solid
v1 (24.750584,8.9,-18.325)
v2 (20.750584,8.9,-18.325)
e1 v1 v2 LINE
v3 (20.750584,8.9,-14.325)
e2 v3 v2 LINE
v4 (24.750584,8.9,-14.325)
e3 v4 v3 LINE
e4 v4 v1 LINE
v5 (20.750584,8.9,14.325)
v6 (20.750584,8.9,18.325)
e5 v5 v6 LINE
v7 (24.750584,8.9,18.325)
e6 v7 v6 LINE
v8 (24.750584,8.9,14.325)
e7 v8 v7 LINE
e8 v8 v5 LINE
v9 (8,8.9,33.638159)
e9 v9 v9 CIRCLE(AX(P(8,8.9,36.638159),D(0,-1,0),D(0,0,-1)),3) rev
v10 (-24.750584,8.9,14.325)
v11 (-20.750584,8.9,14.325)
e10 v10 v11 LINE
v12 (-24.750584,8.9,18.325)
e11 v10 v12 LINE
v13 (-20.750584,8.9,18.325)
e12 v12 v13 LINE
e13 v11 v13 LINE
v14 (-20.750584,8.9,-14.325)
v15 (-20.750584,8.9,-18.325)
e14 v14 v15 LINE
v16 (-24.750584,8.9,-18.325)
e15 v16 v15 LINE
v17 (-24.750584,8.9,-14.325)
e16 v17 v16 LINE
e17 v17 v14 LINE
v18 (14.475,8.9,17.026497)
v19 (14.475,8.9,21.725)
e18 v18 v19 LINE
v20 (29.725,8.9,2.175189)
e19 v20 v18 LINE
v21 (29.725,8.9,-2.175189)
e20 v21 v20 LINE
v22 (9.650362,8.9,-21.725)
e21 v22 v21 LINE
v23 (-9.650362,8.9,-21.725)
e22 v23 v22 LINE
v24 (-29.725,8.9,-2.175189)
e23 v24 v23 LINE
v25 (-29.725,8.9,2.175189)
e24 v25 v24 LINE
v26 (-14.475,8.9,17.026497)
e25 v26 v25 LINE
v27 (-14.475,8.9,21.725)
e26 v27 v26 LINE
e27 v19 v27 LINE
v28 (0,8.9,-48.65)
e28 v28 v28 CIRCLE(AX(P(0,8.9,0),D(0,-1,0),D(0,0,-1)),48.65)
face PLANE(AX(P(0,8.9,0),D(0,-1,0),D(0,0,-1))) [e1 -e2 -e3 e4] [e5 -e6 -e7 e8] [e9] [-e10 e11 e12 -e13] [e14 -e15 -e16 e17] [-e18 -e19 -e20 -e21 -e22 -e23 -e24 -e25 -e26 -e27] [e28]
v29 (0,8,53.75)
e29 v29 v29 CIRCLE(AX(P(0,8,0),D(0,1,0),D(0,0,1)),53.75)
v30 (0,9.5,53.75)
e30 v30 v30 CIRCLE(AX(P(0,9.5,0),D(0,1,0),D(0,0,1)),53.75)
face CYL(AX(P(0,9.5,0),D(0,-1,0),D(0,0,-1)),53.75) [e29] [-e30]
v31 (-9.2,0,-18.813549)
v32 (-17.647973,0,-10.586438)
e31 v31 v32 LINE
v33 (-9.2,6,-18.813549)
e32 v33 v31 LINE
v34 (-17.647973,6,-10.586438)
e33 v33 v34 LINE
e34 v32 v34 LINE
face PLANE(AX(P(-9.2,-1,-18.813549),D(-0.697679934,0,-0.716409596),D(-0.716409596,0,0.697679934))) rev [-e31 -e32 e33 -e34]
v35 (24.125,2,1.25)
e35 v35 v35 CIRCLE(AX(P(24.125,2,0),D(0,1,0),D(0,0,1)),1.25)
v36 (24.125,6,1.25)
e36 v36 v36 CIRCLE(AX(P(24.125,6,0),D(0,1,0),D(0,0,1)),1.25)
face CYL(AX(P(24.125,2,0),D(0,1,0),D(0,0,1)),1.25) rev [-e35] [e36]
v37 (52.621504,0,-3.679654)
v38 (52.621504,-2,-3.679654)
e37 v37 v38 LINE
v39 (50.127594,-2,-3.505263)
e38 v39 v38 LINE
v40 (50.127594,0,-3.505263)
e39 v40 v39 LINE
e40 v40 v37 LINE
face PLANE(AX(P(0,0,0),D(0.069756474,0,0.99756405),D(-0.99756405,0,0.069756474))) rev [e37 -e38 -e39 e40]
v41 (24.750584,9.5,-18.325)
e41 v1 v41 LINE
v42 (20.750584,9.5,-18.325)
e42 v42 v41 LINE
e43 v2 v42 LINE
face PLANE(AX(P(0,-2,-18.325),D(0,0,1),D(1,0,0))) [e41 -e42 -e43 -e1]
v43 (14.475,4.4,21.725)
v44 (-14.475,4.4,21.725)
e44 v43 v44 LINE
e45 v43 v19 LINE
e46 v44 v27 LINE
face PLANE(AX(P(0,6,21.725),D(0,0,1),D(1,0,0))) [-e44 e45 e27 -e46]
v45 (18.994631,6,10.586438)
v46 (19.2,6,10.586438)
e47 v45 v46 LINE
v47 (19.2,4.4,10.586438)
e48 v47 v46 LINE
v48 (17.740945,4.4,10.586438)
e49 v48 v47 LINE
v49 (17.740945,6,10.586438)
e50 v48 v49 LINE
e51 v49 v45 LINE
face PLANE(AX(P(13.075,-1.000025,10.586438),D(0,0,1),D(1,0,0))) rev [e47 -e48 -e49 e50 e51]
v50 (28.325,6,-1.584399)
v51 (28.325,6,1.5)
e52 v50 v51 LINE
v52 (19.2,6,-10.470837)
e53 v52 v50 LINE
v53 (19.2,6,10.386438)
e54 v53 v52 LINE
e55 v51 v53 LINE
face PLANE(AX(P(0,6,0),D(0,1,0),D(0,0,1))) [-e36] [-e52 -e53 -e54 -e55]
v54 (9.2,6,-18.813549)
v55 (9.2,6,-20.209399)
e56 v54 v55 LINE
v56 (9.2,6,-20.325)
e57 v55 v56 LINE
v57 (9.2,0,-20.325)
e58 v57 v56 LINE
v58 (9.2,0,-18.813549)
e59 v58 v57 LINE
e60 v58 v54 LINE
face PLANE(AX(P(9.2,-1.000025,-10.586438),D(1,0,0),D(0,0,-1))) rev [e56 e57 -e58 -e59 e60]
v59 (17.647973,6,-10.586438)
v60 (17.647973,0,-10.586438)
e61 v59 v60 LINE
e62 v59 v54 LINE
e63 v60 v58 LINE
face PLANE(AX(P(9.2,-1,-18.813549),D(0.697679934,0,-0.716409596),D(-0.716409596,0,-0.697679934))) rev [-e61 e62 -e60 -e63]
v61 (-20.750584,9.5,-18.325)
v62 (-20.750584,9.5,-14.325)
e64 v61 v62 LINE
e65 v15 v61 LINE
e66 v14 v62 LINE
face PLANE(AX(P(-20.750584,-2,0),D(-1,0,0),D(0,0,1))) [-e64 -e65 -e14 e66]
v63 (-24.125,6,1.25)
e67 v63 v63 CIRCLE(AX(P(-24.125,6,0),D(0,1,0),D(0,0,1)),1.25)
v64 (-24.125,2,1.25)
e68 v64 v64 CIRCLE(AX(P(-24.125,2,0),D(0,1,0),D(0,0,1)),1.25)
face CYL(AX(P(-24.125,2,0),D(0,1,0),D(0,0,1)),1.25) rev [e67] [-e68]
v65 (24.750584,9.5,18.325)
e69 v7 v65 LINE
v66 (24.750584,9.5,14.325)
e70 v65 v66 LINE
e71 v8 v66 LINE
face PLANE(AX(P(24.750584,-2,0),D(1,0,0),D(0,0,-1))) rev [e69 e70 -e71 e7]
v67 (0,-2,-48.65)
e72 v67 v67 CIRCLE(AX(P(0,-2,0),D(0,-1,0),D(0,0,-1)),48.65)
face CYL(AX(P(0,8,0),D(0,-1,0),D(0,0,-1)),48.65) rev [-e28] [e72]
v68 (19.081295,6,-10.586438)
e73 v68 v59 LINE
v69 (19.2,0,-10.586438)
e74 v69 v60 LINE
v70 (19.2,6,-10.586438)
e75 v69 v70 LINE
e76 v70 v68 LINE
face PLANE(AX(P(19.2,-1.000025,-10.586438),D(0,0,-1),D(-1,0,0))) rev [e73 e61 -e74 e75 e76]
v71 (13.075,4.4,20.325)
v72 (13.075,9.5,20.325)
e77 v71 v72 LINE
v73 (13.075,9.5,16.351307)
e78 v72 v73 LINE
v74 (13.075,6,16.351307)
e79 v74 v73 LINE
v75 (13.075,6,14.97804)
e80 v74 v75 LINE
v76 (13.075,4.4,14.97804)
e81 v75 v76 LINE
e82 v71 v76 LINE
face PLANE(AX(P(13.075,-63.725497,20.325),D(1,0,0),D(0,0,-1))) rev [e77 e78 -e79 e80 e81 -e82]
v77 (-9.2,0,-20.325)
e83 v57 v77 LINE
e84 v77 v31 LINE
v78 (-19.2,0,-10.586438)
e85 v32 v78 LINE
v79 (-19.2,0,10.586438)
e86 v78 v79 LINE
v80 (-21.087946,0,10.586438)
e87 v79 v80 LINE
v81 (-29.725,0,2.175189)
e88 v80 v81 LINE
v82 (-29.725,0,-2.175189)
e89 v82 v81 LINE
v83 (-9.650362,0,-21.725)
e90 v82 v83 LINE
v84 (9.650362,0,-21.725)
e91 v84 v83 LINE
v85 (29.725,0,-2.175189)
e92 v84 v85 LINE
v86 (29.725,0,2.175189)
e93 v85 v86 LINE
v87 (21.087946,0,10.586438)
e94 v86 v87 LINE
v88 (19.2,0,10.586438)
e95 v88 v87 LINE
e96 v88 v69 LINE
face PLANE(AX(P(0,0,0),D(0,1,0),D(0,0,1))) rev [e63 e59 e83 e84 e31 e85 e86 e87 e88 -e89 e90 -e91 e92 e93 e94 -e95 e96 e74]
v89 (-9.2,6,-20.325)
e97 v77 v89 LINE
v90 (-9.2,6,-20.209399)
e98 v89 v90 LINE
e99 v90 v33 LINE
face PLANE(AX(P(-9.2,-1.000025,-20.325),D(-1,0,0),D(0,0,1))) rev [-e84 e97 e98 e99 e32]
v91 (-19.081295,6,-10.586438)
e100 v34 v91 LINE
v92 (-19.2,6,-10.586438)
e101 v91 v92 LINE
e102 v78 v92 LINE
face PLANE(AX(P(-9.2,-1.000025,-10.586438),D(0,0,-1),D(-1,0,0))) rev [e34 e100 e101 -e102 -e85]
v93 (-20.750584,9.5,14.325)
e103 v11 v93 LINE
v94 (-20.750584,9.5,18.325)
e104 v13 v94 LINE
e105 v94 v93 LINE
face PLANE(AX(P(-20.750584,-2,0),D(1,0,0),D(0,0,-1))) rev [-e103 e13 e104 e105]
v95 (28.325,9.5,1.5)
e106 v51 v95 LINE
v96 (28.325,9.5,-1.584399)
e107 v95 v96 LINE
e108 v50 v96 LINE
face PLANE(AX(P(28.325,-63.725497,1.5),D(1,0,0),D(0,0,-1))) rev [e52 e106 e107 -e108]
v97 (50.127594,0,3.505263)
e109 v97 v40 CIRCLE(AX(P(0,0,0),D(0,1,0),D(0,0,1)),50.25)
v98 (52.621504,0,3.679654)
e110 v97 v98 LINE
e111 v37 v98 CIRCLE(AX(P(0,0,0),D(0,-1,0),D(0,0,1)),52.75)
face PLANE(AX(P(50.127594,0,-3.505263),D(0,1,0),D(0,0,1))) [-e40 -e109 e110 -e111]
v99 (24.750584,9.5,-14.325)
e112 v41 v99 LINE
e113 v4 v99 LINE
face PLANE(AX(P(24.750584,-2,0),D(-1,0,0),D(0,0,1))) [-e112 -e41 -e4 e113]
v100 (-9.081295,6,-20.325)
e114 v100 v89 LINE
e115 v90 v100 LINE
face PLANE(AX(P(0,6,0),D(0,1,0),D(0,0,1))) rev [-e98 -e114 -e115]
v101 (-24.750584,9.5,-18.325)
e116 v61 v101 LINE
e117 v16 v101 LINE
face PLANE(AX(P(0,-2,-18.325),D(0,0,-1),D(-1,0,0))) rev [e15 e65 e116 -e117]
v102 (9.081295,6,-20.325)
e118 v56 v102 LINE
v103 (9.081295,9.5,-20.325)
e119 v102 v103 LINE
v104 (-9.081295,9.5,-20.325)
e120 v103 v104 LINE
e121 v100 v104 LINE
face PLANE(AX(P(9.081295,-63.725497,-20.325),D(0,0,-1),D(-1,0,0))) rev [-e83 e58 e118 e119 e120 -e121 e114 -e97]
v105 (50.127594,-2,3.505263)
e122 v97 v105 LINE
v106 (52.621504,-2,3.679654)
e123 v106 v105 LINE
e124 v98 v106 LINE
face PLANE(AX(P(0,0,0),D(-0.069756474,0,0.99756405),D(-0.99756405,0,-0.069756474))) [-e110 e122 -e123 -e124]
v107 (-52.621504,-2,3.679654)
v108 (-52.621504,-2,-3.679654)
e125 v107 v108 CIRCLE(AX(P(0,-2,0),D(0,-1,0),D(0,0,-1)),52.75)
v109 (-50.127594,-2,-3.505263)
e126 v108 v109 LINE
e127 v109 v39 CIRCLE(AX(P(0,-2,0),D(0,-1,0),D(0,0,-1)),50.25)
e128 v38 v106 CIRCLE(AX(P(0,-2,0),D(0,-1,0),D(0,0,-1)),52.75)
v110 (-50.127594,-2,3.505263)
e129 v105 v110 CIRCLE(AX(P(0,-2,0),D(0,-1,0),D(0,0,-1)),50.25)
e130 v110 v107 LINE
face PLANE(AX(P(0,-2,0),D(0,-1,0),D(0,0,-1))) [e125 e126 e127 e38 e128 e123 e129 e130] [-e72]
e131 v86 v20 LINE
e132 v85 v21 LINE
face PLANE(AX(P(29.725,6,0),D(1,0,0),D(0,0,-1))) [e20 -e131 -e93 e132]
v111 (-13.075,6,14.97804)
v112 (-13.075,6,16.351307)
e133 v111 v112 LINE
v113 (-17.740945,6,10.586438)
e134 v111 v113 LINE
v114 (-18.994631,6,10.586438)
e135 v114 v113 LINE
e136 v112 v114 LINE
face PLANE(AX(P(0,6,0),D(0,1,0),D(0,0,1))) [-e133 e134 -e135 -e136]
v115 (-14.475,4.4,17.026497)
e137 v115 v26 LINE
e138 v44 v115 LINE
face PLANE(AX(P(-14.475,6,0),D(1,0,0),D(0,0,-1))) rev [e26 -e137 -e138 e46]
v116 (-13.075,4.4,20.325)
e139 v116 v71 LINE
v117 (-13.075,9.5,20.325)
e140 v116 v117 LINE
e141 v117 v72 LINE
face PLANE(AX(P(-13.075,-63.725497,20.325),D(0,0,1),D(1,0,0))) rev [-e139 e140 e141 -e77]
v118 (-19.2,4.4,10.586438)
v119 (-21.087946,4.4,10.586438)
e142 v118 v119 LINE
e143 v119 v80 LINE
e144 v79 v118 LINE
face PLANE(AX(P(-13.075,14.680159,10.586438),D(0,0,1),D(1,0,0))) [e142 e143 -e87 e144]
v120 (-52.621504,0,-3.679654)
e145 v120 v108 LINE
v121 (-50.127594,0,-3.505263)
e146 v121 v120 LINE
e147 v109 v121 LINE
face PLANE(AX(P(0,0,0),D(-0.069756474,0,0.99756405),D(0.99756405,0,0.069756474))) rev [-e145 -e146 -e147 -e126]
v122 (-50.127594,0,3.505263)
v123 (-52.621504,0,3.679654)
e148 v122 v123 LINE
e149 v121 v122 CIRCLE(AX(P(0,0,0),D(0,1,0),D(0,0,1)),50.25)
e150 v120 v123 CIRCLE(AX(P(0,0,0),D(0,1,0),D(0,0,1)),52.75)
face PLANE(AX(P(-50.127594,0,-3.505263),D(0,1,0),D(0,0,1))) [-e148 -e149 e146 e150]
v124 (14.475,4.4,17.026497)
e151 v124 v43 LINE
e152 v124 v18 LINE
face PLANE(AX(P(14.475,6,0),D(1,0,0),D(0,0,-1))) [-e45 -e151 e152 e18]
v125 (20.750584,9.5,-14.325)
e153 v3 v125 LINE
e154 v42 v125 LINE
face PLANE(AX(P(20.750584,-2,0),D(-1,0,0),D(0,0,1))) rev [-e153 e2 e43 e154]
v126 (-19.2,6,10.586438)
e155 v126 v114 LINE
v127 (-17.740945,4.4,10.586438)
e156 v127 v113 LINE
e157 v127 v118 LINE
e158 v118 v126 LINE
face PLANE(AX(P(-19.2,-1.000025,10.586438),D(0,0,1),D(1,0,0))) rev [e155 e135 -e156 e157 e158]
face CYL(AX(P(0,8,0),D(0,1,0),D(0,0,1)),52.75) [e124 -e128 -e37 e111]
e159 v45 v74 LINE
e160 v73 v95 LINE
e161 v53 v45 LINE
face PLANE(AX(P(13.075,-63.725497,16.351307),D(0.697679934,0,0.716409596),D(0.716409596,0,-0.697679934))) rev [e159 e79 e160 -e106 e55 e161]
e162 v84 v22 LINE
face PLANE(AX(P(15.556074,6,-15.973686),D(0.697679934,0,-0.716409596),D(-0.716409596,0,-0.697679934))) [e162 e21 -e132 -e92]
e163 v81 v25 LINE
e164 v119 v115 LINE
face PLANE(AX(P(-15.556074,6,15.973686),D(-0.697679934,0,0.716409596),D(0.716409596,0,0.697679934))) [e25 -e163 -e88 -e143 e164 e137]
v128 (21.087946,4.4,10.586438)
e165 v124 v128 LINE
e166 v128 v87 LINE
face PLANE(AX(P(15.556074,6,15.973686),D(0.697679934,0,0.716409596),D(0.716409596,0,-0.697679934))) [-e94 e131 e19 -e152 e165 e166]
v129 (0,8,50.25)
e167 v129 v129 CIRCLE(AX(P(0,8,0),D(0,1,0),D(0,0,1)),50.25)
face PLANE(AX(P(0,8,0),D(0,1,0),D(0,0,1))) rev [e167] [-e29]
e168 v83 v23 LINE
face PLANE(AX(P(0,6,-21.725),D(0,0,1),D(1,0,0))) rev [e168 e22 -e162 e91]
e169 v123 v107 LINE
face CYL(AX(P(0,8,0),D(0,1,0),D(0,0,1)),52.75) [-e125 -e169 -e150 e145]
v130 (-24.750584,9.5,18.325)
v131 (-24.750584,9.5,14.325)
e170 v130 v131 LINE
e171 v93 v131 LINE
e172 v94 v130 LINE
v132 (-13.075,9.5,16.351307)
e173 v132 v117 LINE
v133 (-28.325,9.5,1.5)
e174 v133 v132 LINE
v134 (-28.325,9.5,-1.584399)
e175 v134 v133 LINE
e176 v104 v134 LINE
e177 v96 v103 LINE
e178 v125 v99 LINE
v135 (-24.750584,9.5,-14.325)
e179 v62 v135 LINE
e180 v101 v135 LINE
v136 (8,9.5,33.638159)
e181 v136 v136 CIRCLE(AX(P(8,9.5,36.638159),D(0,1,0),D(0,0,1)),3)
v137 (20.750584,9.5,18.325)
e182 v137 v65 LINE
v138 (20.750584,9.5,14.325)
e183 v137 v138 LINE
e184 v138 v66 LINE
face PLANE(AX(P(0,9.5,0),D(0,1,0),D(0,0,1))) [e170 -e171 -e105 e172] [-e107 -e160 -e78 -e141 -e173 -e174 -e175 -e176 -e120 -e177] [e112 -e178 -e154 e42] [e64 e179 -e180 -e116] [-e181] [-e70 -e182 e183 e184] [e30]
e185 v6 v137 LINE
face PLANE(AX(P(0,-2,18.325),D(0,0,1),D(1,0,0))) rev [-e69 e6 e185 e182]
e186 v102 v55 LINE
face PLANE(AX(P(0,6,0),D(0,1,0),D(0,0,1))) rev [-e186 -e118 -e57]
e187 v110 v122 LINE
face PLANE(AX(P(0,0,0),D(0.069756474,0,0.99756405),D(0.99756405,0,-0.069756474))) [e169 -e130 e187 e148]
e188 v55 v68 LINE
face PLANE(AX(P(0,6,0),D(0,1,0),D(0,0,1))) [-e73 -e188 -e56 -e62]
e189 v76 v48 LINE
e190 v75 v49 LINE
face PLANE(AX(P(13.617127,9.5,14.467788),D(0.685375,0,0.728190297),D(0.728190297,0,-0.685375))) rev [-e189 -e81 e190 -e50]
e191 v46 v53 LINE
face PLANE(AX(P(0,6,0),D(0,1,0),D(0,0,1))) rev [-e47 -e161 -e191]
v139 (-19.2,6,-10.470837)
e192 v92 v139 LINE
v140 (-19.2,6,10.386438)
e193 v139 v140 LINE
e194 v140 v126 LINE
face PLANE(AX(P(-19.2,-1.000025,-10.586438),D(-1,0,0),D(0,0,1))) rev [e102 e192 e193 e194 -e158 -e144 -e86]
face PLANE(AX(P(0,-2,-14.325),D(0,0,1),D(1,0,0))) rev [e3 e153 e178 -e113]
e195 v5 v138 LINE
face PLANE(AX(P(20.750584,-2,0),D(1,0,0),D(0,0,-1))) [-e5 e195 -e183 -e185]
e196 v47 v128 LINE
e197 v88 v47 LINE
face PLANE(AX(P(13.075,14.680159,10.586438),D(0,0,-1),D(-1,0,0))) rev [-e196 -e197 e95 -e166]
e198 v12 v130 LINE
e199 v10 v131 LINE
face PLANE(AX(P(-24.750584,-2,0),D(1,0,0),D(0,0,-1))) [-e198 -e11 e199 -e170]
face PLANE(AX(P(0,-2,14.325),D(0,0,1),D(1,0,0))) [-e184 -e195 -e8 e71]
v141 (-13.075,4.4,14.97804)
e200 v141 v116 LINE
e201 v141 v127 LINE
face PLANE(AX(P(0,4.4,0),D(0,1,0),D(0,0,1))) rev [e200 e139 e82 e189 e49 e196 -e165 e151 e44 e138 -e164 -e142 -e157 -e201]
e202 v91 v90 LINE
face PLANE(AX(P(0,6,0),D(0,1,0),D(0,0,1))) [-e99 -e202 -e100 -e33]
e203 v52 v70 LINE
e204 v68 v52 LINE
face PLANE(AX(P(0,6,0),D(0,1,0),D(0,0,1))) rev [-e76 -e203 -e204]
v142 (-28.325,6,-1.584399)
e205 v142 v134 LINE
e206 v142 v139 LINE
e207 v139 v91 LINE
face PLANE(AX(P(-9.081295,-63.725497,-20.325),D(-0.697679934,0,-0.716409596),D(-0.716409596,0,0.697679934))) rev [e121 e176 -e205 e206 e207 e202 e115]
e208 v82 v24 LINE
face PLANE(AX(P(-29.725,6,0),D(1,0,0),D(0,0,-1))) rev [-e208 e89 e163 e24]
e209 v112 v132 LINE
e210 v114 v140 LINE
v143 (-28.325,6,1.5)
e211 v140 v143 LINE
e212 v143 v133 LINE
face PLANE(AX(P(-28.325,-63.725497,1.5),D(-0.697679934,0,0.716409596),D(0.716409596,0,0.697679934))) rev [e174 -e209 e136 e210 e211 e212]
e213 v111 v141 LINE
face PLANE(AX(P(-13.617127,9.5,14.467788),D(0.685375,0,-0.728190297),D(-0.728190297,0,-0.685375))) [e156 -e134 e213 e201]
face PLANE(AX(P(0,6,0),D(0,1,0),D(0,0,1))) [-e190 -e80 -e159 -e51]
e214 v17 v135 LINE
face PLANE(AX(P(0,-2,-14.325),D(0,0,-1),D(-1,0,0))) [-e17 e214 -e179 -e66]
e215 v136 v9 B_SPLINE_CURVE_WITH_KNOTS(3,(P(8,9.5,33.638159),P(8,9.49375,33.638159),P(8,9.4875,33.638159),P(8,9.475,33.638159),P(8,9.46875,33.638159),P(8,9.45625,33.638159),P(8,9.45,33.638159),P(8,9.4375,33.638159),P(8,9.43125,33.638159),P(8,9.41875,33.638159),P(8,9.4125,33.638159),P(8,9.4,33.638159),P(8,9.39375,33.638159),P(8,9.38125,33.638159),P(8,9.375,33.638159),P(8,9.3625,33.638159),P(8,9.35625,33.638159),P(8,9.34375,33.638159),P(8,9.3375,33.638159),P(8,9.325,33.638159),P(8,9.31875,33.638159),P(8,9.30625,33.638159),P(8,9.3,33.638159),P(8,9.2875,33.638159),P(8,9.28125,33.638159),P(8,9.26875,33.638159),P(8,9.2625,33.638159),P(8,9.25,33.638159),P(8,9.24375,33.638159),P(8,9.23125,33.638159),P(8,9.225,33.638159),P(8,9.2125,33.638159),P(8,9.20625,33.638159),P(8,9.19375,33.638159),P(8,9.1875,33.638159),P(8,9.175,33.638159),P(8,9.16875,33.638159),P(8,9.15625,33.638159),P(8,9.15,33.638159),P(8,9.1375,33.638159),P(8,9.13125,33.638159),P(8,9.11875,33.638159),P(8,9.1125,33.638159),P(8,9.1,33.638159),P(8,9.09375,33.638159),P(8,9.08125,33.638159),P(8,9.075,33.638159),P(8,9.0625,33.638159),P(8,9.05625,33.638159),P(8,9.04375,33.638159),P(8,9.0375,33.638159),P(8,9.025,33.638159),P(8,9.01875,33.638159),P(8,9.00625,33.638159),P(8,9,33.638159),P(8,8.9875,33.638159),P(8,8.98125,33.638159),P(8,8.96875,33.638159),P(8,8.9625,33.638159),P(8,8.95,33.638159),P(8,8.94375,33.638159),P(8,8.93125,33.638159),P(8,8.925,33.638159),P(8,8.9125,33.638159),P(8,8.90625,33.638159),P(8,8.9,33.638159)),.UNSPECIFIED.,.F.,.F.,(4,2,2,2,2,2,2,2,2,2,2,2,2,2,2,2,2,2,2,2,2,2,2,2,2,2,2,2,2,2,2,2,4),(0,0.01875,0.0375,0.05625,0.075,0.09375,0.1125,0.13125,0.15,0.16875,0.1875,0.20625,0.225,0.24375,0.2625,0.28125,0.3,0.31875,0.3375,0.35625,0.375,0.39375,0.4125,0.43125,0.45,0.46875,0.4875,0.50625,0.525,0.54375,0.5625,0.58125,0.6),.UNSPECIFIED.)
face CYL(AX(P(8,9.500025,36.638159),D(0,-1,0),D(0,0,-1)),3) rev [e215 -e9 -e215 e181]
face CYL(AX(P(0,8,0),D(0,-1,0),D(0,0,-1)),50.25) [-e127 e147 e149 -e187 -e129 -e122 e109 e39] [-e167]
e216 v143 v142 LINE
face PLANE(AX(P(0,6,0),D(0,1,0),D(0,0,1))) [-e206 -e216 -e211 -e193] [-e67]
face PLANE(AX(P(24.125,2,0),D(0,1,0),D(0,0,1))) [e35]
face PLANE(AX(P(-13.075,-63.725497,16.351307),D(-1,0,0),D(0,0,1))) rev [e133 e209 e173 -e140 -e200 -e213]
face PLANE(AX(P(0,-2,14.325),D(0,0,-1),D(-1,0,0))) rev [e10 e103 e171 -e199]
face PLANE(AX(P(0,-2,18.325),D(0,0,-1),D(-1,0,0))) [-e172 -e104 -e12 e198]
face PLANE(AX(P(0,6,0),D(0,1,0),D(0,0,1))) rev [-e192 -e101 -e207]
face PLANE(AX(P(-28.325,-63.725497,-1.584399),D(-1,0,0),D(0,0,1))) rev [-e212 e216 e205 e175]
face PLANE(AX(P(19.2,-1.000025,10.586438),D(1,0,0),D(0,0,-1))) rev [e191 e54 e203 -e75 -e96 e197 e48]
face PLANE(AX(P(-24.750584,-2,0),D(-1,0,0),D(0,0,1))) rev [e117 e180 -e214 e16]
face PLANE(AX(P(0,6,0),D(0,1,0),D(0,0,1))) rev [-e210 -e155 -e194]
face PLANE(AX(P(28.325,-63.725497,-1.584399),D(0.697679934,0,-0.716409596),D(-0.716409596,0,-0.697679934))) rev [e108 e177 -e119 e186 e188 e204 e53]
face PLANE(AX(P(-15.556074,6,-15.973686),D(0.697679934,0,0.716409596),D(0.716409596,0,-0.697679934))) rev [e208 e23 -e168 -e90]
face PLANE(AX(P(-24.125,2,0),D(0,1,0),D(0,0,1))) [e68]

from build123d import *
from build123d.topology import SkipClean

# Parameters (mm, degrees)
SKETCH1_R           = 50.25
BOSS_EXTRUDE1_DEPTH = 8
SKETCH2_R           = 53.75
BOSS_EXTRUDE3_DEPTH = 1.5
SHELL1_T            = -1.6
REVOLVE1_START      = -1
REVOLVE1_DEPTH      = 1
BOSS_EXTRUDE4_START = 7.9
SKETCH6_R           = 48.65
BOSS_EXTRUDE4_DEPTH = 7.9
SKETCH5_W           = 9
SKETCH5_H           = 1.5
CUT_EXTRUDE1_DEPTH  = 3.5
SKETCH7_W           = 38
SKETCH7_H           = 20.772875816
SKETCH7_W_2         = 18
SKETCH7_H_2         = 9.738562092
CUT_EXTRUDE2_DEPTH  = 77.335607681
SHELL3_OUTLINE_R    = 48.65
SHELL3_DEPTH        = 7.9
SHELL3_2_DEPTH      = 4.4
BOSS_EXTRUDE6_DEPTH = 4.4
SKETCH8_R           = 1.25
CUT_EXTRUDE3_DEPTH  = 4
CUT_EXTRUDE4_START  = -4.4
SKETCH10_W          = 28.95
SKETCH10_H          = 4.698503494
CUT_EXTRUDE4_DEPTH  = 4.4
SKETCH11_R          = 3
CUT_EXTRUDE5_DEPTH  = 77.533228078
CUT_EXTRUDE6_DEPTH  = 3.5
SKETCH13_R          = 48.65
CUT_EXTRUDE7_DEPTH  = 1
CUT_EXTRUDE8_DEPTH  = 77.335607681
BOSS_EXTRUDE7_START = 1
SKETCH15_R          = 50.25
SKETCH15_R_2        = 48.65
BOSS_EXTRUDE7_DEPTH = 1
CUT_EXTRUDE9_DEPTH  = 77.335607681
BOSS_EXTRUDE8_DEPTH = 4.4
CUT_EXTRUDE10_DEPTH = 77.605319659
CUT_EXTRUDE11_START = -4.4
SKETCH19_W          = 8.012946077
SKETCH19_H          = 6.440058598
CUT_EXTRUDE11_DEPTH = 4.4
BOSS_EXTRUDE9_START = 1
SKETCH20_R          = 48.65
BOSS_EXTRUDE9_DEPTH = 1
SKETCH21_W          = 4
SKETCH21_H          = 4
CUT_EXTRUDE12_DEPTH = 77.878963312


# Read off the part's stored shape, not the designer's step: Revolve1, Shell3
with BuildPart() as part:
    # Sketch1 → Boss-Extrude1 (new body)
    with BuildSketch(Plane(origin=(0, 0, 0), x_dir=(1, 0, 0), z_dir=(0, 1, 0))):
        with Locations(Location((0, 0, 0), (0, 0, 270))):
            Circle(SKETCH1_R)
    extrude(amount=BOSS_EXTRUDE1_DEPTH)

    # Sketch2 → Boss-Extrude3 (add)
    with BuildSketch(Plane(origin=(0, 8, 0), x_dir=(1, 0, 0), z_dir=(0, 1, 0))):
        with Locations(Location((0, 0, 0), (0, 0, 270))):
            Circle(SKETCH2_R)
    extrude(amount=BOSS_EXTRUDE3_DEPTH)

    # Shell1
    shell1_openings = [part.faces().sort_by_distance(p)[0] for p in [
        (0, 0, 0),
    ]]
    offset(amount=SHELL1_T, openings=shell1_openings, kind=Kind.INTERSECTION)

    # Revolve1 outline → Revolve1 (add)
    with BuildSketch(Plane(origin=(0, 0, 0), x_dir=(1, 0, 0), z_dir=(0, 1, 0)).offset(REVOLVE1_START)):
        with BuildLine():
            ThreePointArc((-52.621503651, 3.67965399), (-52.75, 0), (-52.621503651, -3.67965399))
            Line((-52.621503651, -3.67965399), (-48.531491045, -3.393652448))
            ThreePointArc((-48.531491045, -3.393652448), (-48.65, 0), (-48.531491045, 3.393652448))
            Line((-48.531491045, 3.393652448), (-52.621503651, 3.67965399))
        make_face()
    revolve1 = extrude(amount=REVOLVE1_DEPTH)

    # Mirror1: Revolve1 across plane
    add(revolve1.mirror(Plane(origin=(0, 0, 0), x_dir=(0, 0, 1), z_dir=(1, 0, 0))))

    # Sketch6 → Boss-Extrude4 (add)
    with BuildSketch(Plane.XZ.offset(-7.9).offset(BOSS_EXTRUDE4_START)):
        Circle(SKETCH6_R)
    extrude(amount=-BOSS_EXTRUDE4_DEPTH)

    # Sketch5 → Cut-Extrude1 (cut)
    with BuildSketch(Plane(origin=(0, 9.5, 0), x_dir=(1, 0, 0), z_dir=(0, 1, 0))):
        with BuildLine():
            ThreePointArc((0, -14), (-4.78887909, -13.155479355), (-9, -10.723805295))
            Line((-9, -10.723805295), (-9, -20.125))
            Line((-9, -20.125), (0, -20.125))
            Line((0, -20.125), (0, -14))
        make_face()
        with BuildLine():
            ThreePointArc((9, -10.723805295), (4.78887909, -13.155479355), (0, -14))
            Line((0, -14), (0, -20.125))
            Line((0, -20.125), (9, -20.125))
            Line((9, -20.125), (9, -10.723805295))
        make_face()
        with BuildLine():
            ThreePointArc((13.919410907, -1.5), (12.352914438, -6.588285429), (9, -10.723805295))
            Line((9, -10.723805295), (9, -20.125))
            Line((9, -20.125), (12.875, -16.35130719))
            Line((12.875, -16.35130719), (28.125, -1.5))
            Line((28.125, -1.5), (13.919410907, -1.5))
        make_face()
        Polygon((12.875, -16.35130719), (9, -20.125), (12.875, -20.125), align=None)
        Polygon((-9, -20.125), (-12.875, -16.35130719), (-12.875, -20.125), align=None)
        with BuildLine():
            Line((-13.919410907, -1.5), (-28.125, -1.5))
            Line((-28.125, -1.5), (-12.875, -16.35130719))
            Line((-12.875, -16.35130719), (-9, -20.125))
            Line((-9, -20.125), (-9, -10.723805295))
            ThreePointArc((-9, -10.723805295), (-12.352914438, -6.588285429), (-13.919410907, -1.5))
        make_face()
        with BuildLine():
            Line((-9, -1.5), (-13.919410907, -1.5))
            ThreePointArc((-13.919410907, -1.5), (-12.352914438, -6.588285429), (-9, -10.723805295))
            Line((-9, -10.723805295), (-9, -1.5))
        make_face()
        with BuildLine():
            Line((0, -1.5), (-9, -1.5))
            Line((-9, -1.5), (-9, -10.723805295))
            ThreePointArc((-9, -10.723805295), (-4.78887909, -13.155479355), (0, -14))
            Line((0, -14), (0, -1.5))
        make_face()
        with BuildLine():
            Line((9, -1.5), (0, -1.5))
            Line((0, -1.5), (0, -14))
            ThreePointArc((0, -14), (4.78887909, -13.155479355), (9, -10.723805295))
            Line((9, -10.723805295), (9, -1.5))
        make_face()
        with BuildLine():
            Line((13.919410907, -1.5), (9, -1.5))
            Line((9, -1.5), (9, -10.723805295))
            ThreePointArc((9, -10.723805295), (12.352914438, -6.588285429), (13.919410907, -1.5))
        make_face()
        with BuildLine():
            ThreePointArc((14, 0), (13.979838209, -0.751081654), (13.919410907, -1.5))
            Line((13.919410907, -1.5), (28.125, -1.5))
            Line((28.125, -1.5), (28.125, 0))
            Line((28.125, 0), (26, 0))
            ThreePointArc((26, 0), (25.633883476, -0.883883476), (24.75, -1.25))
            Line((24.75, -1.25), (23.5, -1.25))
            ThreePointArc((23.5, -1.25), (22.616116524, -0.883883476), (22.25, 0))
            Line((22.25, 0), (14, 0))
        make_face()
        with BuildLine():
            Line((28.125, 0), (28.125, 1.5))
            Line((28.125, 1.5), (13.919410907, 1.5))
            ThreePointArc((13.919410907, 1.5), (13.979838209, 0.751081654), (14, 0))
            Line((14, 0), (22.25, 0))
            ThreePointArc((22.25, 0), (22.616116524, 0.883883476), (23.5, 1.25))
            Line((23.5, 1.25), (24.75, 1.25))
            ThreePointArc((24.75, 1.25), (25.633883476, 0.883883476), (26, 0))
            Line((26, 0), (28.125, 0))
        make_face()
        with BuildLine():
            Line((22.25, 0), (26, 0))
            ThreePointArc((26, 0), (25.633883476, 0.883883476), (24.75, 1.25))
            Line((24.75, 1.25), (23.5, 1.25))
            ThreePointArc((23.5, 1.25), (22.616116524, 0.883883476), (22.25, 0))
        make_face()
        with BuildLine():
            ThreePointArc((24.75, -1.25), (25.633883476, -0.883883476), (26, 0))
            Line((26, 0), (22.25, 0))
            ThreePointArc((22.25, 0), (22.616116524, -0.883883476), (23.5, -1.25))
            Line((23.5, -1.25), (24.75, -1.25))
        make_face()
        with BuildLine():
            Line((9, 0), (9, -1.5))
            Line((9, -1.5), (13.919410907, -1.5))
            ThreePointArc((13.919410907, -1.5), (13.979838209, -0.751081654), (14, 0))
            Line((14, 0), (9, 0))
        make_face()
        with BuildLine():
            Line((13.919410907, 1.5), (9, 1.5))
            Line((9, 1.5), (9, 0))
            Line((9, 0), (14, 0))
            ThreePointArc((14, 0), (13.979838209, 0.751081654), (13.919410907, 1.5))
        make_face()
        with Locations((4.5, 0.75)):
            Rectangle(SKETCH5_W, SKETCH5_H)
        with Locations((4.5, -0.75)):
            Rectangle(SKETCH5_W, SKETCH5_H)
        with Locations((-4.5, 0.75)):
            Rectangle(SKETCH5_W, SKETCH5_H)
        with Locations((-4.5, -0.75)):
            Rectangle(SKETCH5_W, SKETCH5_H)
        with BuildLine():
            ThreePointArc((-14, 0), (-13.979838209, -0.751081654), (-13.919410907, -1.5))
            Line((-13.919410907, -1.5), (-9, -1.5))
            Line((-9, -1.5), (-9, 0))
            Line((-9, 0), (-14, 0))
        make_face()
        with BuildLine():
            Line((-9, 1.5), (-13.919410907, 1.5))
            ThreePointArc((-13.919410907, 1.5), (-13.979838209, 0.751081654), (-14, 0))
            Line((-14, 0), (-9, 0))
            Line((-9, 0), (-9, 1.5))
        make_face()
        with BuildLine():
            Line((-28.125, 1.5), (-28.125, 0))
            Line((-28.125, 0), (-26, 0))
            ThreePointArc((-26, 0), (-25.633883476, 0.883883476), (-24.75, 1.25))
            Line((-24.75, 1.25), (-23.5, 1.25))
            ThreePointArc((-23.5, 1.25), (-22.616116524, 0.883883476), (-22.25, 0))
            Line((-22.25, 0), (-14, 0))
            ThreePointArc((-14, 0), (-13.979838209, 0.751081654), (-13.919410907, 1.5))
            Line((-13.919410907, 1.5), (-28.125, 1.5))
        make_face()
        with BuildLine():
            Line((-26, 0), (-28.125, 0))
            Line((-28.125, 0), (-28.125, -1.5))
            Line((-28.125, -1.5), (-13.919410907, -1.5))
            ThreePointArc((-13.919410907, -1.5), (-13.979838209, -0.751081654), (-14, 0))
            Line((-14, 0), (-22.25, 0))
            ThreePointArc((-22.25, 0), (-22.616116524, -0.883883476), (-23.5, -1.25))
            Line((-23.5, -1.25), (-24.75, -1.25))
            ThreePointArc((-24.75, -1.25), (-25.633883476, -0.883883476), (-26, 0))
        make_face()
        with BuildLine():
            Line((-22.25, 0), (-26, 0))
            ThreePointArc((-26, 0), (-25.633883476, -0.883883476), (-24.75, -1.25))
            Line((-24.75, -1.25), (-23.5, -1.25))
            ThreePointArc((-23.5, -1.25), (-22.616116524, -0.883883476), (-22.25, 0))
        make_face()
        with BuildLine():
            ThreePointArc((-24.75, 1.25), (-25.633883476, 0.883883476), (-26, 0))
            Line((-26, 0), (-22.25, 0))
            ThreePointArc((-22.25, 0), (-22.616116524, 0.883883476), (-23.5, 1.25))
            Line((-23.5, 1.25), (-24.75, 1.25))
        make_face()
        with BuildLine():
            Line((-9, 20.125), (-28.125, 1.5))
            Line((-28.125, 1.5), (-13.919410907, 1.5))
            ThreePointArc((-13.919410907, 1.5), (-12.352914438, 6.588285429), (-9, 10.723805295))
            Line((-9, 10.723805295), (-9, 20.125))
        make_face()
        with BuildLine():
            ThreePointArc((-9, 10.723805295), (-12.352914438, 6.588285429), (-13.919410907, 1.5))
            Line((-13.919410907, 1.5), (-9, 1.5))
            Line((-9, 1.5), (-9, 10.723805295))
        make_face()
        with BuildLine():
            Line((0, 20.125), (-9, 20.125))
            Line((-9, 20.125), (-9, 10.723805295))
            ThreePointArc((-9, 10.723805295), (-4.78887909, 13.155479355), (0, 14))
            Line((0, 14), (0, 20.125))
        make_face()
        with BuildLine():
            ThreePointArc((0, 14), (-4.78887909, 13.155479355), (-9, 10.723805295))
            Line((-9, 10.723805295), (-9, 1.5))
            Line((-9, 1.5), (0, 1.5))
            Line((0, 1.5), (0, 14))
        make_face()
        with BuildLine():
            ThreePointArc((9, 10.723805295), (4.78887909, 13.155479355), (0, 14))
            Line((0, 14), (0, 1.5))
            Line((0, 1.5), (9, 1.5))
            Line((9, 1.5), (9, 10.723805295))
        make_face()
        with BuildLine():
            Line((9, 20.125), (0, 20.125))
            Line((0, 20.125), (0, 14))
            ThreePointArc((0, 14), (4.78887909, 13.155479355), (9, 10.723805295))
            Line((9, 10.723805295), (9, 20.125))
        make_face()
        with BuildLine():
            Line((28.125, 1.5), (9, 20.125))
            Line((9, 20.125), (9, 10.723805295))
            ThreePointArc((9, 10.723805295), (12.352914438, 6.588285429), (13.919410907, 1.5))
            Line((13.919410907, 1.5), (28.125, 1.5))
        make_face()
        with BuildLine():
            ThreePointArc((13.919410907, 1.5), (12.352914438, 6.588285429), (9, 10.723805295))
            Line((9, 10.723805295), (9, 1.5))
            Line((9, 1.5), (13.919410907, 1.5))
        make_face()
    extrude(amount=-CUT_EXTRUDE1_DEPTH, mode=Mode.SUBTRACT)

    # Sketch7 → Cut-Extrude2 (cut, through all)
    with BuildSketch(Plane(origin=(0, 6, 0), x_dir=(1, 0, 0), z_dir=(0, 1, 0))):
        Polygon((12.875, -10.386437908), (-12.875, -10.386437908), (-12.875, -16.35130719), (-12.875, -20.125), (12.875, -20.125), (12.875, -16.35130719), align=None)
        Rectangle(SKETCH7_W, SKETCH7_H)
        with Locations((0, 15.255718954)):
            Rectangle(SKETCH7_W_2, SKETCH7_H_2)
    extrude(amount=-CUT_EXTRUDE2_DEPTH, mode=Mode.SUBTRACT)

    # Shell3 outline → Shell3 (cut)
    with BuildSketch(Plane(origin=(0, 0, 0), x_dir=(1, 0, 0), z_dir=(0, 1, 0))):
        Circle(SHELL3_OUTLINE_R)
        Polygon((9.650362184, 21.725), (29.725, 2.175189317), (29.725, -2.175189317), (14.475, -17.026496506), (14.475, -21.725), (-14.475, -21.725), (-14.475, -17.026496506), (-29.725, -2.175189317), (-29.725, 2.175189317), (-9.650362184, 21.725), align=None, mode=Mode.SUBTRACT)
    extrude(amount=SHELL3_DEPTH, mode=Mode.SUBTRACT)

    # Shell3 2 outline → Shell3 2 (cut)
    with BuildSketch(Plane(origin=(0, 0, 0), x_dir=(1, 0, 0), z_dir=(0, 1, 0))):
        Polygon((29.725, -2.175189317), (29.725, 2.175189317), (20.6, 11.061627225), (20.6, -11.061627225), align=None)
        Polygon((10.6, 11.986437908), (19.650362184, 11.986437908), (10.6, 20.800189317), align=None)
        Polygon((14.475, -17.026496506), (19.650362184, -11.986437908), (14.475, -11.986437908), align=None)
        Polygon((-10.6, 11.986437908), (-10.6, 20.800189317), (-19.650362184, 11.986437908), align=None)
        Polygon((-19.650362184, -11.986437908), (-14.475, -17.026496506), (-14.475, -11.986437908), align=None)
        Polygon((-20.6, -11.061627225), (-20.6, 11.061627225), (-29.725, 2.175189317), (-29.725, -2.175189317), align=None)
    extrude(amount=SHELL3_2_DEPTH, mode=Mode.SUBTRACT)

    # Sketch9 → Boss-Extrude6 (add)
    with BuildSketch(Plane.XZ.offset(-4.4)):
        Polygon((-20.6, 11.061627225), (-29.725, 2.175189317), (-29.725, -2.175189317), (-20.6, -11.061627225), align=None)
    boss_extrude6 = extrude(amount=BOSS_EXTRUDE6_DEPTH)

    # Mirror2: Boss-Extrude6 across plane
    add(boss_extrude6.mirror(Plane(origin=(0, 0, 0), x_dir=(0, 0, 1), z_dir=(1, 0, 0))))

    # Sketch8 → Cut-Extrude3 (cut)
    with BuildSketch(Plane(origin=(0, 6, 0), x_dir=(1, 0, 0), z_dir=(0, 1, 0))):
        with Locations(Location((-24.125, 0, 0), (0, 0, 270))):
            Circle(SKETCH8_R)
        with Locations(Location((24.125, 0, 0), (0, 0, 270))):
            Circle(SKETCH8_R)
    extrude(amount=-CUT_EXTRUDE3_DEPTH, mode=Mode.SUBTRACT)

    # Sketch10 → Cut-Extrude4 (cut)
    with BuildSketch(Plane.XZ.offset(CUT_EXTRUDE4_START)):
        with Locations((0, 19.375748253)):
            Rectangle(SKETCH10_W, SKETCH10_H)
    extrude(amount=CUT_EXTRUDE4_DEPTH, mode=Mode.SUBTRACT)

    # Sketch11 → Cut-Extrude5 (cut, through all)
    with BuildSketch(Plane.XZ.offset(-7.9)):
        with Locations(Location((8, 36.638158505, 0), (0, 0, 270))):
            Circle(SKETCH11_R)
    extrude(amount=-CUT_EXTRUDE5_DEPTH, mode=Mode.SUBTRACT)

    # Sketch12 → Cut-Extrude6 (cut)
    with BuildSketch(Plane(origin=(0, 9.5, 0), x_dir=(1, 0, 0), z_dir=(0, 1, 0))):
        Polygon((28.325, -1.5), (28.325, 1.584398665), (9.081295273, 20.325), (-9.081295273, 20.325), (-28.325, 1.584398665), (-28.325, -1.5), (-13.075, -16.35130719), (-13.075, -20.325), (13.075, -20.325), (13.075, -16.35130719), align=None)
    extrude(amount=-CUT_EXTRUDE6_DEPTH, mode=Mode.SUBTRACT)

    # Sketch13 → Cut-Extrude7 (cut)
    with BuildSketch(Plane.XZ.offset(-7.9)):
        with Locations(Location((0, 0, 0), (0, 0, 270))):
            Circle(SKETCH13_R)
        Polygon((-9.650362184, -21.725), (9.650362184, -21.725), (29.725, -2.175189317), (29.725, 2.175189317), (14.475, 17.026496506), (14.475, 21.725), (-14.475, 21.725), (-14.475, 17.026496506), (-29.725, 2.175189317), (-29.725, -2.175189317), align=None, mode=Mode.SUBTRACT)
    extrude(amount=-CUT_EXTRUDE7_DEPTH, mode=Mode.SUBTRACT)

    # Sketch14 → Cut-Extrude8 (cut, through all)
    with BuildSketch(Plane(origin=(0, 6, 0), x_dir=(1, 0, 0), z_dir=(0, 1, 0))):
        Polygon((-13.075, -20.325), (13.075, -20.325), (13.075, -10.586437908), (19.2, -10.586437908), (19.2, 10.586437908), (9.2, 10.586437908), (9.2, 20.325), (-9.2, 20.325), (-9.2, 10.586437908), (-19.2, 10.586437908), (-19.2, -10.586437908), (-13.075, -10.586437908), align=None)
    extrude(amount=-CUT_EXTRUDE8_DEPTH, mode=Mode.SUBTRACT)

    # Sketch15 → Boss-Extrude7 (add)
    with SkipClean():  # the faces are left unmerged after this step: merging them gives an invalid solid
        with BuildSketch(Plane.XZ.offset(BOSS_EXTRUDE7_START)):
            with Locations(Location((0, 0, 0), (0, 0, 356))):
                Circle(SKETCH15_R)
            with Locations(Location((0, 0, 0), (0, 0, 270))):
                Circle(SKETCH15_R_2, mode=Mode.SUBTRACT)
        extrude(amount=-BOSS_EXTRUDE7_DEPTH)

    # Sketch16 → Cut-Extrude9 (cut, through all)
    with SkipClean():  # the faces are left unmerged after this step: merging them gives an invalid solid
        with BuildSketch(Plane(origin=(0, 6, 0), x_dir=(1, 0, 0), z_dir=(0, 1, 0))):
            Polygon((-17.64797327, 10.586437908), (-9.2, 10.586437908), (-9.2, 18.813549133), align=None)
            Polygon((17.64797327, 10.586437908), (9.2, 10.586437908), (9.2, 18.813549133), align=None)
        extrude(amount=-CUT_EXTRUDE9_DEPTH, mode=Mode.SUBTRACT)

    # Sketch17 → Boss-Extrude8 (add)
    with SkipClean():  # the faces are left unmerged after this step: merging them gives an invalid solid
        with BuildSketch(Plane.XZ.offset(-4.4)):
            Polygon((19.650362184, -11.986437908), (16.210389378, -11.986437908), (10.6, -17.45015044), (10.6, -20.800189317), align=None)
            Polygon((-10.6, -20.800189317), (-10.6, -17.45015044), (-16.210389378, -11.986437908), (-19.650362184, -11.986437908), align=None)
        extrude(amount=BOSS_EXTRUDE8_DEPTH)

    # Sketch18 → Cut-Extrude10 (cut, through all)
    with SkipClean():  # the faces are left unmerged after this step: merging them gives an invalid solid
        with BuildSketch(Plane.XZ):
            Polygon((13.075, 10.586437908), (17.740944739, 10.586437908), (16.2534869, 11.986437908), (14.475, 11.986437908), (14.475, 13.660355377), (13.075, 14.978039785), align=None)
            Polygon((14.475, 11.986437908), (16.2534869, 11.986437908), (14.475, 13.660355377), align=None)
        cut_extrude10 = extrude(amount=-CUT_EXTRUDE10_DEPTH, mode=Mode.SUBTRACT)

    # Sketch19 → Cut-Extrude11 (cut)
    with SkipClean():  # the faces are left unmerged after this step: merging them gives an invalid solid
        with BuildSketch(Plane.XZ.offset(CUT_EXTRUDE11_START)):
            with Locations((17.081473039, 13.806467207)):
                Rectangle(SKETCH19_W, SKETCH19_H)
        cut_extrude11 = extrude(amount=CUT_EXTRUDE11_DEPTH, mode=Mode.SUBTRACT)

    # Mirror3: Cut-Extrude10, Cut-Extrude11 across plane
    with SkipClean():  # the faces are left unmerged after this step: merging them gives an invalid solid
        add(cut_extrude10.mirror(Plane(origin=(0, 0, 0), x_dir=(0, 0, 1), z_dir=(1, 0, 0))), mode=Mode.SUBTRACT)
        add(cut_extrude11.mirror(Plane(origin=(0, 0, 0), x_dir=(0, 0, 1), z_dir=(1, 0, 0))), mode=Mode.SUBTRACT)

    # Sketch20 → Boss-Extrude9 (add)
    with SkipClean():  # the faces are left unmerged after this step: merging them gives an invalid solid
        with BuildSketch(Plane.XZ.offset(1).offset(BOSS_EXTRUDE9_START)):
            with BuildLine():
                Line((-50.127593526, 3.505262806), (-52.621503651, 3.67965399))
                ThreePointArc((-52.621503651, 3.67965399), (-52.75, 0), (-52.621503651, -3.67965399))
                Line((-52.621503651, -3.67965399), (-50.127593526, -3.505262806))
                ThreePointArc((-50.127593526, -3.505262806), (0, -50.25), (50.127593526, -3.505262806))
                Line((50.127593526, -3.505262806), (52.621503651, -3.67965399))
                ThreePointArc((52.621503651, -3.67965399), (52.75, 0), (52.621503651, 3.67965399))
                Line((52.621503651, 3.67965399), (50.127593526, 3.505262806))
                ThreePointArc((50.127593526, 3.505262806), (0, 50.25), (-50.127593526, 3.505262806))
            make_face()
            with Locations(Location((0, 0, 0), (0, 0, 270))):
                Circle(SKETCH20_R, mode=Mode.SUBTRACT)
        extrude(amount=-BOSS_EXTRUDE9_DEPTH)

    # Sketch21 → Cut-Extrude12 (cut, through all)
    with SkipClean():  # the faces are left unmerged after this step: merging them gives an invalid solid
        with BuildSketch(Plane(origin=(0, 9.5, 0), x_dir=(1, 0, 0), z_dir=(0, 1, 0))):
            with Locations((-22.750584256, 16.325)):
                Rectangle(SKETCH21_W, SKETCH21_H)
            with Locations((22.750584256, 16.325)):
                Rectangle(SKETCH21_W, SKETCH21_H)
            with Locations((22.750584256, -16.325)):
                Rectangle(SKETCH21_W, SKETCH21_H)
            with Locations((-22.750584256, -16.325)):
                Rectangle(SKETCH21_W, SKETCH21_H)
        extrude(amount=-CUT_EXTRUDE12_DEPTH, mode=Mode.SUBTRACT)


solid = part.part
